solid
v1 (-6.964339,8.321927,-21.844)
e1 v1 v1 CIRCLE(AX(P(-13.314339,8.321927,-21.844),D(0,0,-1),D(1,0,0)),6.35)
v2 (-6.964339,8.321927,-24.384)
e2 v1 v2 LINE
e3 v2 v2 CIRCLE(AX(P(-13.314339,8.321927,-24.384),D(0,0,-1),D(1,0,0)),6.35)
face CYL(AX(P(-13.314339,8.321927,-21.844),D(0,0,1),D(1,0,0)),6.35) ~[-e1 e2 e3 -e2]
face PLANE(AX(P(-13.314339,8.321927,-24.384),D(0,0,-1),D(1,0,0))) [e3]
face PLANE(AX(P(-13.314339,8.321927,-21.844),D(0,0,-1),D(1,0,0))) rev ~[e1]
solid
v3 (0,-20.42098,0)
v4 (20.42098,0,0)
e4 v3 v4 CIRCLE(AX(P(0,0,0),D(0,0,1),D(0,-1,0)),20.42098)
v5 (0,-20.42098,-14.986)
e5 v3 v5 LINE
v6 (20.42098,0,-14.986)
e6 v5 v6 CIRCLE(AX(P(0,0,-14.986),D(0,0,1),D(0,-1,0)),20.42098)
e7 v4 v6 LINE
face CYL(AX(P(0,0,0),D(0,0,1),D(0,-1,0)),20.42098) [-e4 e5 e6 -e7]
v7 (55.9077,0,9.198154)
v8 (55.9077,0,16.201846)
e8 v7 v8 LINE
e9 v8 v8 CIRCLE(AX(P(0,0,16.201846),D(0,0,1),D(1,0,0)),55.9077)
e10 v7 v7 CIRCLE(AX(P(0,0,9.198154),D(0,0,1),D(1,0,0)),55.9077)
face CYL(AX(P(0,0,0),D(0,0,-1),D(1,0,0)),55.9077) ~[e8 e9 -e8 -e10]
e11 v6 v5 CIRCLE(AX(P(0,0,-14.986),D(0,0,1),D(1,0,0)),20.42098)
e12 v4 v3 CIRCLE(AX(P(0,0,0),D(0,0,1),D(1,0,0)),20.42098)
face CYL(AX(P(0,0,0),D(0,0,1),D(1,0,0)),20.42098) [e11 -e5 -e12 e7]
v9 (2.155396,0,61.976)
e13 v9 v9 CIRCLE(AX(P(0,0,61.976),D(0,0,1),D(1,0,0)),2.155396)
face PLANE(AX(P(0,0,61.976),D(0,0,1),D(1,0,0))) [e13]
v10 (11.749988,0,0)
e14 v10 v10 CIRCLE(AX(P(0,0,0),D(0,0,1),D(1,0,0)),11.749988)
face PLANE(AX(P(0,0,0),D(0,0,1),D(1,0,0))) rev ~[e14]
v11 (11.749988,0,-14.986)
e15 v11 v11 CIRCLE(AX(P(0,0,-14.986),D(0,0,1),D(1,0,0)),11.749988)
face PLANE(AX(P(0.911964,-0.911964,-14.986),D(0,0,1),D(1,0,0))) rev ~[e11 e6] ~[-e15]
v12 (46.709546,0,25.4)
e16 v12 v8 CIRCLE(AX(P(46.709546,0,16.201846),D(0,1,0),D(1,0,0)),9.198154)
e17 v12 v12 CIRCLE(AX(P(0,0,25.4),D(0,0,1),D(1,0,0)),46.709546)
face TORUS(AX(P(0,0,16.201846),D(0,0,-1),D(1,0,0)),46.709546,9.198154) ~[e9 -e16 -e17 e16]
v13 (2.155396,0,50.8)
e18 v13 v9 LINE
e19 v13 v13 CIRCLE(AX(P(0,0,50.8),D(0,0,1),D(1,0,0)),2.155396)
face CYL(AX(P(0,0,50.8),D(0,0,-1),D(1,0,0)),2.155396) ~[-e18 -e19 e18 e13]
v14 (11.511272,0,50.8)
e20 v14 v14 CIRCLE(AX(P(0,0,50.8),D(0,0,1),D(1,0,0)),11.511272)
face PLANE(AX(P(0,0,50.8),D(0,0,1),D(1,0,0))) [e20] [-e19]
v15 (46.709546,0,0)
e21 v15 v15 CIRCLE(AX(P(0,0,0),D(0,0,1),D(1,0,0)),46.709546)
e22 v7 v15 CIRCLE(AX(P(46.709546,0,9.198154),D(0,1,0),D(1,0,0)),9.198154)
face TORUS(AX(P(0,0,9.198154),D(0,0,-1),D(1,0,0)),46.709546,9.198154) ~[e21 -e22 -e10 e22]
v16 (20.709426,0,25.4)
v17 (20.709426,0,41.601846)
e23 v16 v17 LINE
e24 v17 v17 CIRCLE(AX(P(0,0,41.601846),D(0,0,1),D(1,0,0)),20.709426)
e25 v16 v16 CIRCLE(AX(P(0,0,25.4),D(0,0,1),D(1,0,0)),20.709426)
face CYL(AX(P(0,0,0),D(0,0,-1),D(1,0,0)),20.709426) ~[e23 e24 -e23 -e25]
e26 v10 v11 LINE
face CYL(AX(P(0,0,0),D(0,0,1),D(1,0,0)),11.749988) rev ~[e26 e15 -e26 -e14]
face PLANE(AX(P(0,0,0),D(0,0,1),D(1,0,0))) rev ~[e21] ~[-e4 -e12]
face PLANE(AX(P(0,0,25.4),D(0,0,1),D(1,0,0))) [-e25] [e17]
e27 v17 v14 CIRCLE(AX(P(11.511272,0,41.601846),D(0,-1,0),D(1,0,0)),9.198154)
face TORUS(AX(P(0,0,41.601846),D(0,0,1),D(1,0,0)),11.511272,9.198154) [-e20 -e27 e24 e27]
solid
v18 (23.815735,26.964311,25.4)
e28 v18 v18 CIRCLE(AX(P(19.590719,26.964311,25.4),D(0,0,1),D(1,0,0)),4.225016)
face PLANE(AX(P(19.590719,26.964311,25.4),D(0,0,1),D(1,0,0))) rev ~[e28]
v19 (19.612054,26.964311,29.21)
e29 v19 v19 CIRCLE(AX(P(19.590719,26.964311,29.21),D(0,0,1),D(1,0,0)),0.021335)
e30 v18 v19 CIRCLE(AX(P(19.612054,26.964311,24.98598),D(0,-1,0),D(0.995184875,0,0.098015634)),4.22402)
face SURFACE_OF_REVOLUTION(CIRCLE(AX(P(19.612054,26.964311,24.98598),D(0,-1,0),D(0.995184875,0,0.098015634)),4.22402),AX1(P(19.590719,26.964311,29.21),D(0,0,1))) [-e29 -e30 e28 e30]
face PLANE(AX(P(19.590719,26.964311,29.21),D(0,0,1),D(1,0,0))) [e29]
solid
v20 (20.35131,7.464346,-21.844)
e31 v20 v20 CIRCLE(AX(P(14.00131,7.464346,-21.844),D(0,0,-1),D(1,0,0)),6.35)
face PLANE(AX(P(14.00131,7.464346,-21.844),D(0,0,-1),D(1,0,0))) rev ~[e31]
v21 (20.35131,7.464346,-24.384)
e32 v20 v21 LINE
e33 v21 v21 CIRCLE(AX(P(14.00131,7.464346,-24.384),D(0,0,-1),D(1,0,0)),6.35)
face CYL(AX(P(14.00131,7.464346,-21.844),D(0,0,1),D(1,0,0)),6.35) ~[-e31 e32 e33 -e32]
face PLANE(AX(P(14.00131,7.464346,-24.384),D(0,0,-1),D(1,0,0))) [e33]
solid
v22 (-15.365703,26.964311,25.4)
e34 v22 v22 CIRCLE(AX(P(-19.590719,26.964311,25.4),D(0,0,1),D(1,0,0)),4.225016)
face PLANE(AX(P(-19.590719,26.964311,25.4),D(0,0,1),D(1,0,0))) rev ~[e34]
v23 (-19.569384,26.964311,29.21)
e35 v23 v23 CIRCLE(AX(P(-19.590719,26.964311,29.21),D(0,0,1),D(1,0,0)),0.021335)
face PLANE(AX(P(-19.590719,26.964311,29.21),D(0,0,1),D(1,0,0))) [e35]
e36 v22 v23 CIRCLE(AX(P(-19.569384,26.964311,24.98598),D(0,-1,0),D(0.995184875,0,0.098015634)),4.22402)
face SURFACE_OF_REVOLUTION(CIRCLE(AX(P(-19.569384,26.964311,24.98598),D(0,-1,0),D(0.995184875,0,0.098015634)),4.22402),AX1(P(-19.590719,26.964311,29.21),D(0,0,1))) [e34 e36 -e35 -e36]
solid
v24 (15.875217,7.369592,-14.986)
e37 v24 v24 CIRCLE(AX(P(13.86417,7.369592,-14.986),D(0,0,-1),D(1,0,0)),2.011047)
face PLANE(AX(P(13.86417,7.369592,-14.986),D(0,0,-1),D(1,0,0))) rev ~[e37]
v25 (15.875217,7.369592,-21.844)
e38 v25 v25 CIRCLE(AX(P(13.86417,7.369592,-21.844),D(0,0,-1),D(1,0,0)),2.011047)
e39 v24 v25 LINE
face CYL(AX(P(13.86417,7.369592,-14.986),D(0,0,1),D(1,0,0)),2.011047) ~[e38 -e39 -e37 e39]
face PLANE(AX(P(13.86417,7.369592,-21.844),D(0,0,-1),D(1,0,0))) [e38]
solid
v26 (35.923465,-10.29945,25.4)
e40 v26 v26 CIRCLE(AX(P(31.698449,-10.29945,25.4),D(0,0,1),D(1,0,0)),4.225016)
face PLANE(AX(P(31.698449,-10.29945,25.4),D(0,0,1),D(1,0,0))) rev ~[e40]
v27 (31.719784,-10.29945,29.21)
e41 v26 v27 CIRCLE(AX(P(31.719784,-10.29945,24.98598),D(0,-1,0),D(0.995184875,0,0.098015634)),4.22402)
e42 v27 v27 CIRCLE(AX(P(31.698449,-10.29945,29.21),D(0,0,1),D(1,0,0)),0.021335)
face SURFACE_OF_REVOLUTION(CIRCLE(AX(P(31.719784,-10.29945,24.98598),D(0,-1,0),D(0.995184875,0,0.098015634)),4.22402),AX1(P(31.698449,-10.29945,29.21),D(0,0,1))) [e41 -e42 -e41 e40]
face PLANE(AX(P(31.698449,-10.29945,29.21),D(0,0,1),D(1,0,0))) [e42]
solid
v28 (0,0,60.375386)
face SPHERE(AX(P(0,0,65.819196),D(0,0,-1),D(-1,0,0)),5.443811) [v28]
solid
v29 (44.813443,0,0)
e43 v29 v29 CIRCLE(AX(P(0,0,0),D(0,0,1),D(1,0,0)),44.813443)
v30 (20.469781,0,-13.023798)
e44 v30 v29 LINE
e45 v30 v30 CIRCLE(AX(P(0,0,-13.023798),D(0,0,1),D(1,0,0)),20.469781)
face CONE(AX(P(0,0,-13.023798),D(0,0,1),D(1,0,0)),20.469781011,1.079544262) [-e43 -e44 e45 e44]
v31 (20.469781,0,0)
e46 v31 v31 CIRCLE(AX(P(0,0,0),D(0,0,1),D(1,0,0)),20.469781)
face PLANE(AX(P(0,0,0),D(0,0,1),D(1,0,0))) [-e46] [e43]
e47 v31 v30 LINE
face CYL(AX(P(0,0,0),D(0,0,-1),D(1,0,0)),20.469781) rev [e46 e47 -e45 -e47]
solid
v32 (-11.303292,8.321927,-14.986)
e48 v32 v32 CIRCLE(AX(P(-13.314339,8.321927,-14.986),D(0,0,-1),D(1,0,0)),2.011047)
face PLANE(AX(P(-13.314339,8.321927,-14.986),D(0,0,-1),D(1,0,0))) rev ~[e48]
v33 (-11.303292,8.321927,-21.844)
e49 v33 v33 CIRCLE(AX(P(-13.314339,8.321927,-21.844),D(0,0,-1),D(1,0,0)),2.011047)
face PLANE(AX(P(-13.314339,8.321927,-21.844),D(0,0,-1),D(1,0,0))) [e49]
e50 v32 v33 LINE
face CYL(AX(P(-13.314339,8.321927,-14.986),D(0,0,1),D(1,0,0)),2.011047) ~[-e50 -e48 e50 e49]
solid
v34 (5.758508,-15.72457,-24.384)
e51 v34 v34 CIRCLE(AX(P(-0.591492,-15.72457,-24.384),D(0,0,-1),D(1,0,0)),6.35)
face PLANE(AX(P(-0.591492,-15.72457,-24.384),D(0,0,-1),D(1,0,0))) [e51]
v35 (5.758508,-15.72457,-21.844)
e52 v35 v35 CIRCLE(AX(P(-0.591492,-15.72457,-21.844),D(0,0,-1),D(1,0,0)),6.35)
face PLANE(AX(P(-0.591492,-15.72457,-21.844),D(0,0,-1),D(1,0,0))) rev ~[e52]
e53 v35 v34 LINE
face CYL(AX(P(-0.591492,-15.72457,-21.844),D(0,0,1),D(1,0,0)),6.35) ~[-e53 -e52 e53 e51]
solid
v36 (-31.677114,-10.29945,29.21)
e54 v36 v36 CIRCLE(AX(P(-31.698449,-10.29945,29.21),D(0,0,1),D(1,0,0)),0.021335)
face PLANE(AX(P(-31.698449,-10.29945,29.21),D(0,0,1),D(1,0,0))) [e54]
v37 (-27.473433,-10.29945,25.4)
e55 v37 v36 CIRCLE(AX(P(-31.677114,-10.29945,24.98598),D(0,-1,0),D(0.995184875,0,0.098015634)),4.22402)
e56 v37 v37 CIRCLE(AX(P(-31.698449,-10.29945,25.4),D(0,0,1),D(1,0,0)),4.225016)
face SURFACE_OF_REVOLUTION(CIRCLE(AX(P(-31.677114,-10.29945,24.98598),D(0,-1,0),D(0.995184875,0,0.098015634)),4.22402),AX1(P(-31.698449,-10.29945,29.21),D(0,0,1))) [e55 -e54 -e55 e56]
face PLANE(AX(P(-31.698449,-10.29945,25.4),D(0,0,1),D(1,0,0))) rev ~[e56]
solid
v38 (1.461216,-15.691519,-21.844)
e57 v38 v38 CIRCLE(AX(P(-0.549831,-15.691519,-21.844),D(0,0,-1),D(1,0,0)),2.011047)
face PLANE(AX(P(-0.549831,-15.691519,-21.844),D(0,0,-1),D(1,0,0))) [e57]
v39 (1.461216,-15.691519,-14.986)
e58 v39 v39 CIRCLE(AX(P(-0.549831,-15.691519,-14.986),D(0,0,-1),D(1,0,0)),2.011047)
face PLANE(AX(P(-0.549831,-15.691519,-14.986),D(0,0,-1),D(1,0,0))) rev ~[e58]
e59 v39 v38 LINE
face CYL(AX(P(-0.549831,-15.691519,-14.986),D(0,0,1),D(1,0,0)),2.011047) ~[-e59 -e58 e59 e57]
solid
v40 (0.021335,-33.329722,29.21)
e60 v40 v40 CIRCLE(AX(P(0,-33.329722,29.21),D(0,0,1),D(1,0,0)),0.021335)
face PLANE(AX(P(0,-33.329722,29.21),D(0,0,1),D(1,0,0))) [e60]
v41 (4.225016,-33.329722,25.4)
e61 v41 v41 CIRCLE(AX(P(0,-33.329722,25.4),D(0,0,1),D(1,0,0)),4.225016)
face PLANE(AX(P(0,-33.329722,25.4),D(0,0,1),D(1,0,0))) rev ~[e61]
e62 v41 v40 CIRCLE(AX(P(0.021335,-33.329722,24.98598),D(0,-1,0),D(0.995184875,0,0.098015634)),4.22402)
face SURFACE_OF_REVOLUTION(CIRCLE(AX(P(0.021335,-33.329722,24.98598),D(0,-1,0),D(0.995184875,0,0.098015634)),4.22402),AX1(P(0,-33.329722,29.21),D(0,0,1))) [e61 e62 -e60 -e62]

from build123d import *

# Parameters (mm, degrees)
F0_R      = 55.907699691
F0_R_2    = 20.7094261491
F1_DEPTH  = 25.4
F2_DEPTH  = 50.8
F3_R      = 9.1981536726
F4_R      = 11.7499881289
F5_DEPTH  = 14.986
F7_R      = 2.155396083
F8_DEPTH  = 11.176
F13_R     = 2.0110469696
F14_DEPTH = 6.858
F15_R     = 6.35
F15_R_2   = 2.0110469696
F16_DEPTH = 2.54
F17_R     = 4.2250159327
F18_DEPTH = 3.81


# Not quite as in the source:
# - a fillet or chamfer that OpenCascade refuses, or shapes differently, is made with other operations: its cross-section is extruded or revolved along the edge and cut away or added


with BuildPart() as f1:
    # F0 (on Top) → F1 (new body)
    with BuildSketch(Plane.XY):
        Circle(F0_R)
        Circle(F0_R_2, mode=Mode.SUBTRACT)
    extrude(amount=F1_DEPTH)

    # F0 (on Top) → F2 (join)
    with BuildSketch(Plane.XY):
        Circle(F0_R_2)
    extrude(amount=F2_DEPTH)

    # F3
    f3_edges = [f1.edges().sort_by_distance(p)[0] for p in [
        (-55.9077, 0, 25.4),
        (-55.9077, 0, 0),
        (-20.709426, 0, 50.8),
    ]]
    fillet(f3_edges, radius=F3_R)

    # F4 (on Top) → F5 (join)
    with BuildSketch(Plane.XY):
        with BuildLine():
            ThreePointArc((0, -20.4209801223), (14.4398135229, -14.4398135229), (20.4209801223, 0))
            ThreePointArc((20.4209801223, 0), (-14.4398135229, 14.4398135229), (0, -20.4209801223))
        make_face()
        Circle(F4_R, mode=Mode.SUBTRACT)
    extrude(amount=-F5_DEPTH)

    # F7 (on offset) → F8 (join)
    with BuildSketch(Plane.XY.offset(50.8)):
        Circle(F7_R)
    extrude(amount=F8_DEPTH)


with BuildPart() as f10:
    # F9 (on Front) → F10 (revolve)
    with BuildSketch(Plane.XZ):
        with BuildLine():
            Line((0, 60.3753858651), (0, 71.263006941))
            ThreePointArc((0, 71.263006941), (-5.4438105379, 65.819196403), (0, 60.3753858651))
        make_face()
    revolve(axis=Axis((0, 0, 65.819196403), (0, 0, -1)))


with BuildPart() as f12:
    # F11 (on Front) → F12 (revolve)
    with BuildSketch(Plane.XZ):
        Polygon((20.4697810113, 0), (20.4697810113, -13.023798354), (44.8134429753, 0), align=None)
    revolve(axis=Axis((0, 0, 0), (0, 0, 1)))


with BuildPart() as f14:
    # F13 (on face) → F14 (new body)
    with BuildSketch(Plane(origin=(0, 0, -14.986), x_dir=(1, 0, 0), z_dir=(0, 0, -1))):
        with Locations((-13.3143390791, -8.3219271139)):
            Circle(F13_R)
    extrude(amount=F14_DEPTH)


with BuildPart() as f14b:
    # F13 (on face) → F14, piece 2 (new body)
    with BuildSketch(Plane(origin=(0, 0, -14.986), x_dir=(1, 0, 0), z_dir=(0, 0, -1))):
        with Locations((-0.5498307495, 15.691519434)):
            Circle(F13_R)
    extrude(amount=F14_DEPTH)


with BuildPart() as f14c:
    # F13 (on face) → F14, piece 3 (new body)
    with BuildSketch(Plane(origin=(0, 0, -14.986), x_dir=(1, 0, 0), z_dir=(0, 0, -1))):
        with Locations((13.8641698286, -7.3695923202)):
            Circle(F13_R)
    extrude(amount=F14_DEPTH)


with BuildPart() as f16:
    # F15 (on face) → F16 (new body)
    with BuildSketch(Plane(origin=(0, 0, -21.844), x_dir=(1, 0, 0), z_dir=(0, 0, -1))):
        with Locations((-13.3143390791, -8.3219271139)):
            Circle(F15_R)
        with Locations((-13.3143390791, -8.3219271139)):
            Circle(F15_R_2, mode=Mode.SUBTRACT)
        with Locations((-13.3143390791, -8.3219271139)):
            Circle(F15_R_2)
    extrude(amount=F16_DEPTH)


with BuildPart() as f16b:
    # F15 (on face) → F16, piece 2 (new body)
    with BuildSketch(Plane(origin=(0, 0, -21.844), x_dir=(1, 0, 0), z_dir=(0, 0, -1))):
        with Locations((14.0013098717, -7.4643460102)):
            Circle(F15_R)
    extrude(amount=F16_DEPTH)


with BuildPart() as f16c:
    # F15 (on face) → F16, piece 3 (new body)
    with BuildSketch(Plane(origin=(0, 0, -21.844), x_dir=(1, 0, 0), z_dir=(0, 0, -1))):
        with Locations((-0.5914923968, 15.7245695591)):
            Circle(F15_R)
    extrude(amount=F16_DEPTH)


with BuildPart() as f18:
    # F17 (on face) → F18 (new body)
    with BuildSketch(Plane.XY.offset(25.4)):
        with Locations((0, -33.3297215402)):
            Circle(F17_R)
    extrude(amount=F18_DEPTH)

    # F19: fillet of radius 4.22402 on 1 edges, made by hand

    # F19_s1 → F19_t2 (revolve, cut)
    with BuildSketch(Plane.XZ.offset(33.3297215402)):
        with BuildLine():
            ThreePointArc((4.2250159327, 25.4), (2.8580159415, 28.1157702263), (0.021335117, 29.21))
            Line((0.021335117, 29.21), (4.2250159327, 29.21))
            Line((4.2250159327, 29.21), (4.2250159327, 25.4))
        make_face()
    revolve(axis=Axis((0, -33.3297215402, 29.21), (0, 0, 1)), mode=Mode.SUBTRACT)


with BuildPart() as f18b:
    # F17 (on face) → F18, piece 2 (new body)
    with BuildSketch(Plane.XY.offset(25.4)):
        with Locations((31.6984488571, -10.2994503737)):
            Circle(F17_R)
    extrude(amount=F18_DEPTH)

    # F19#2: fillet of radius 4.22402 on 1 edges, made by hand

    # F19_2_s1 → F19_2_t2 (revolve, cut)
    with BuildSketch(Plane.XZ.offset(10.2994503737)):
        with BuildLine():
            ThreePointArc((35.9234647898, 25.4), (34.5564647986, 28.1157702263), (31.7197839742, 29.21))
            Line((31.7197839742, 29.21), (35.9234647898, 29.21))
            Line((35.9234647898, 29.21), (35.9234647898, 25.4))
        make_face()
    revolve(axis=Axis((31.6984488571, -10.2994503737, 29.21), (0, 0, 1)), mode=Mode.SUBTRACT)


with BuildPart() as f18c:
    # F17 (on face) → F18, piece 3 (new body)
    with BuildSketch(Plane.XY.offset(25.4)):
        with Locations((19.5907187844, 26.9643111438)):
            Circle(F17_R)
    extrude(amount=F18_DEPTH)

    # F19#3: fillet of radius 4.22402 on 1 edges, made by hand

    # F19_3_s1 → F19_3_t2 (revolve, cut)
    with BuildSketch(Plane.XZ.offset(-26.9643111438)):
        with BuildLine():
            ThreePointArc((23.815734717, 25.4), (22.4487347259, 28.1157702263), (19.6120539014, 29.21))
            Line((19.6120539014, 29.21), (23.815734717, 29.21))
            Line((23.815734717, 29.21), (23.815734717, 25.4))
        make_face()
    revolve(axis=Axis((19.5907187844, 26.9643111438, 29.21), (0, 0, 1)), mode=Mode.SUBTRACT)


with BuildPart() as f18d:
    # F17 (on face) → F18, piece 4 (new body)
    with BuildSketch(Plane.XY.offset(25.4)):
        with Locations((-19.5907187844, 26.9643111438)):
            Circle(F17_R)
    extrude(amount=F18_DEPTH)

    # F19#4: fillet of radius 4.22402 on 1 edges, made by hand

    # F19_4_s1 → F19_4_t2 (revolve, cut)
    with BuildSketch(Plane.XZ.offset(-26.9643111438)):
        with BuildLine():
            ThreePointArc((-15.3657028517, 25.4), (-16.7327028428, 28.1157702263), (-19.5693836673, 29.21))
            Line((-19.5693836673, 29.21), (-15.3657028517, 29.21))
            Line((-15.3657028517, 29.21), (-15.3657028517, 25.4))
        make_face()
    revolve(axis=Axis((-19.5907187844, 26.9643111438, 29.21), (0, 0, 1)), mode=Mode.SUBTRACT)


with BuildPart() as f18e:
    # F17 (on face) → F18, piece 5 (new body)
    with BuildSketch(Plane.XY.offset(25.4)):
        with Locations((-31.6984488571, -10.2994503737)):
            Circle(F17_R)
    extrude(amount=F18_DEPTH)

    # F19#5: fillet of radius 4.22402 on 1 edges, made by hand

    # F19_5_s1 → F19_5_t2 (revolve, cut)
    with BuildSketch(Plane.XZ.offset(10.2994503737)):
        with BuildLine():
            ThreePointArc((-27.4734329244, 25.4), (-28.8404329156, 28.1157702263), (-31.6771137401, 29.21))
            Line((-31.6771137401, 29.21), (-27.4734329244, 29.21))
            Line((-27.4734329244, 29.21), (-27.4734329244, 25.4))
        make_face()
    revolve(axis=Axis((-31.6984488571, -10.2994503737, 29.21), (0, 0, 1)), mode=Mode.SUBTRACT)


solid = Compound([f1.part, f10.part, f12.part, f14.part, f14b.part, f14c.part, f16.part, f16b.part, f16c.part, f18.part, f18b.part, f18c.part, f18d.part, f18e.part])
